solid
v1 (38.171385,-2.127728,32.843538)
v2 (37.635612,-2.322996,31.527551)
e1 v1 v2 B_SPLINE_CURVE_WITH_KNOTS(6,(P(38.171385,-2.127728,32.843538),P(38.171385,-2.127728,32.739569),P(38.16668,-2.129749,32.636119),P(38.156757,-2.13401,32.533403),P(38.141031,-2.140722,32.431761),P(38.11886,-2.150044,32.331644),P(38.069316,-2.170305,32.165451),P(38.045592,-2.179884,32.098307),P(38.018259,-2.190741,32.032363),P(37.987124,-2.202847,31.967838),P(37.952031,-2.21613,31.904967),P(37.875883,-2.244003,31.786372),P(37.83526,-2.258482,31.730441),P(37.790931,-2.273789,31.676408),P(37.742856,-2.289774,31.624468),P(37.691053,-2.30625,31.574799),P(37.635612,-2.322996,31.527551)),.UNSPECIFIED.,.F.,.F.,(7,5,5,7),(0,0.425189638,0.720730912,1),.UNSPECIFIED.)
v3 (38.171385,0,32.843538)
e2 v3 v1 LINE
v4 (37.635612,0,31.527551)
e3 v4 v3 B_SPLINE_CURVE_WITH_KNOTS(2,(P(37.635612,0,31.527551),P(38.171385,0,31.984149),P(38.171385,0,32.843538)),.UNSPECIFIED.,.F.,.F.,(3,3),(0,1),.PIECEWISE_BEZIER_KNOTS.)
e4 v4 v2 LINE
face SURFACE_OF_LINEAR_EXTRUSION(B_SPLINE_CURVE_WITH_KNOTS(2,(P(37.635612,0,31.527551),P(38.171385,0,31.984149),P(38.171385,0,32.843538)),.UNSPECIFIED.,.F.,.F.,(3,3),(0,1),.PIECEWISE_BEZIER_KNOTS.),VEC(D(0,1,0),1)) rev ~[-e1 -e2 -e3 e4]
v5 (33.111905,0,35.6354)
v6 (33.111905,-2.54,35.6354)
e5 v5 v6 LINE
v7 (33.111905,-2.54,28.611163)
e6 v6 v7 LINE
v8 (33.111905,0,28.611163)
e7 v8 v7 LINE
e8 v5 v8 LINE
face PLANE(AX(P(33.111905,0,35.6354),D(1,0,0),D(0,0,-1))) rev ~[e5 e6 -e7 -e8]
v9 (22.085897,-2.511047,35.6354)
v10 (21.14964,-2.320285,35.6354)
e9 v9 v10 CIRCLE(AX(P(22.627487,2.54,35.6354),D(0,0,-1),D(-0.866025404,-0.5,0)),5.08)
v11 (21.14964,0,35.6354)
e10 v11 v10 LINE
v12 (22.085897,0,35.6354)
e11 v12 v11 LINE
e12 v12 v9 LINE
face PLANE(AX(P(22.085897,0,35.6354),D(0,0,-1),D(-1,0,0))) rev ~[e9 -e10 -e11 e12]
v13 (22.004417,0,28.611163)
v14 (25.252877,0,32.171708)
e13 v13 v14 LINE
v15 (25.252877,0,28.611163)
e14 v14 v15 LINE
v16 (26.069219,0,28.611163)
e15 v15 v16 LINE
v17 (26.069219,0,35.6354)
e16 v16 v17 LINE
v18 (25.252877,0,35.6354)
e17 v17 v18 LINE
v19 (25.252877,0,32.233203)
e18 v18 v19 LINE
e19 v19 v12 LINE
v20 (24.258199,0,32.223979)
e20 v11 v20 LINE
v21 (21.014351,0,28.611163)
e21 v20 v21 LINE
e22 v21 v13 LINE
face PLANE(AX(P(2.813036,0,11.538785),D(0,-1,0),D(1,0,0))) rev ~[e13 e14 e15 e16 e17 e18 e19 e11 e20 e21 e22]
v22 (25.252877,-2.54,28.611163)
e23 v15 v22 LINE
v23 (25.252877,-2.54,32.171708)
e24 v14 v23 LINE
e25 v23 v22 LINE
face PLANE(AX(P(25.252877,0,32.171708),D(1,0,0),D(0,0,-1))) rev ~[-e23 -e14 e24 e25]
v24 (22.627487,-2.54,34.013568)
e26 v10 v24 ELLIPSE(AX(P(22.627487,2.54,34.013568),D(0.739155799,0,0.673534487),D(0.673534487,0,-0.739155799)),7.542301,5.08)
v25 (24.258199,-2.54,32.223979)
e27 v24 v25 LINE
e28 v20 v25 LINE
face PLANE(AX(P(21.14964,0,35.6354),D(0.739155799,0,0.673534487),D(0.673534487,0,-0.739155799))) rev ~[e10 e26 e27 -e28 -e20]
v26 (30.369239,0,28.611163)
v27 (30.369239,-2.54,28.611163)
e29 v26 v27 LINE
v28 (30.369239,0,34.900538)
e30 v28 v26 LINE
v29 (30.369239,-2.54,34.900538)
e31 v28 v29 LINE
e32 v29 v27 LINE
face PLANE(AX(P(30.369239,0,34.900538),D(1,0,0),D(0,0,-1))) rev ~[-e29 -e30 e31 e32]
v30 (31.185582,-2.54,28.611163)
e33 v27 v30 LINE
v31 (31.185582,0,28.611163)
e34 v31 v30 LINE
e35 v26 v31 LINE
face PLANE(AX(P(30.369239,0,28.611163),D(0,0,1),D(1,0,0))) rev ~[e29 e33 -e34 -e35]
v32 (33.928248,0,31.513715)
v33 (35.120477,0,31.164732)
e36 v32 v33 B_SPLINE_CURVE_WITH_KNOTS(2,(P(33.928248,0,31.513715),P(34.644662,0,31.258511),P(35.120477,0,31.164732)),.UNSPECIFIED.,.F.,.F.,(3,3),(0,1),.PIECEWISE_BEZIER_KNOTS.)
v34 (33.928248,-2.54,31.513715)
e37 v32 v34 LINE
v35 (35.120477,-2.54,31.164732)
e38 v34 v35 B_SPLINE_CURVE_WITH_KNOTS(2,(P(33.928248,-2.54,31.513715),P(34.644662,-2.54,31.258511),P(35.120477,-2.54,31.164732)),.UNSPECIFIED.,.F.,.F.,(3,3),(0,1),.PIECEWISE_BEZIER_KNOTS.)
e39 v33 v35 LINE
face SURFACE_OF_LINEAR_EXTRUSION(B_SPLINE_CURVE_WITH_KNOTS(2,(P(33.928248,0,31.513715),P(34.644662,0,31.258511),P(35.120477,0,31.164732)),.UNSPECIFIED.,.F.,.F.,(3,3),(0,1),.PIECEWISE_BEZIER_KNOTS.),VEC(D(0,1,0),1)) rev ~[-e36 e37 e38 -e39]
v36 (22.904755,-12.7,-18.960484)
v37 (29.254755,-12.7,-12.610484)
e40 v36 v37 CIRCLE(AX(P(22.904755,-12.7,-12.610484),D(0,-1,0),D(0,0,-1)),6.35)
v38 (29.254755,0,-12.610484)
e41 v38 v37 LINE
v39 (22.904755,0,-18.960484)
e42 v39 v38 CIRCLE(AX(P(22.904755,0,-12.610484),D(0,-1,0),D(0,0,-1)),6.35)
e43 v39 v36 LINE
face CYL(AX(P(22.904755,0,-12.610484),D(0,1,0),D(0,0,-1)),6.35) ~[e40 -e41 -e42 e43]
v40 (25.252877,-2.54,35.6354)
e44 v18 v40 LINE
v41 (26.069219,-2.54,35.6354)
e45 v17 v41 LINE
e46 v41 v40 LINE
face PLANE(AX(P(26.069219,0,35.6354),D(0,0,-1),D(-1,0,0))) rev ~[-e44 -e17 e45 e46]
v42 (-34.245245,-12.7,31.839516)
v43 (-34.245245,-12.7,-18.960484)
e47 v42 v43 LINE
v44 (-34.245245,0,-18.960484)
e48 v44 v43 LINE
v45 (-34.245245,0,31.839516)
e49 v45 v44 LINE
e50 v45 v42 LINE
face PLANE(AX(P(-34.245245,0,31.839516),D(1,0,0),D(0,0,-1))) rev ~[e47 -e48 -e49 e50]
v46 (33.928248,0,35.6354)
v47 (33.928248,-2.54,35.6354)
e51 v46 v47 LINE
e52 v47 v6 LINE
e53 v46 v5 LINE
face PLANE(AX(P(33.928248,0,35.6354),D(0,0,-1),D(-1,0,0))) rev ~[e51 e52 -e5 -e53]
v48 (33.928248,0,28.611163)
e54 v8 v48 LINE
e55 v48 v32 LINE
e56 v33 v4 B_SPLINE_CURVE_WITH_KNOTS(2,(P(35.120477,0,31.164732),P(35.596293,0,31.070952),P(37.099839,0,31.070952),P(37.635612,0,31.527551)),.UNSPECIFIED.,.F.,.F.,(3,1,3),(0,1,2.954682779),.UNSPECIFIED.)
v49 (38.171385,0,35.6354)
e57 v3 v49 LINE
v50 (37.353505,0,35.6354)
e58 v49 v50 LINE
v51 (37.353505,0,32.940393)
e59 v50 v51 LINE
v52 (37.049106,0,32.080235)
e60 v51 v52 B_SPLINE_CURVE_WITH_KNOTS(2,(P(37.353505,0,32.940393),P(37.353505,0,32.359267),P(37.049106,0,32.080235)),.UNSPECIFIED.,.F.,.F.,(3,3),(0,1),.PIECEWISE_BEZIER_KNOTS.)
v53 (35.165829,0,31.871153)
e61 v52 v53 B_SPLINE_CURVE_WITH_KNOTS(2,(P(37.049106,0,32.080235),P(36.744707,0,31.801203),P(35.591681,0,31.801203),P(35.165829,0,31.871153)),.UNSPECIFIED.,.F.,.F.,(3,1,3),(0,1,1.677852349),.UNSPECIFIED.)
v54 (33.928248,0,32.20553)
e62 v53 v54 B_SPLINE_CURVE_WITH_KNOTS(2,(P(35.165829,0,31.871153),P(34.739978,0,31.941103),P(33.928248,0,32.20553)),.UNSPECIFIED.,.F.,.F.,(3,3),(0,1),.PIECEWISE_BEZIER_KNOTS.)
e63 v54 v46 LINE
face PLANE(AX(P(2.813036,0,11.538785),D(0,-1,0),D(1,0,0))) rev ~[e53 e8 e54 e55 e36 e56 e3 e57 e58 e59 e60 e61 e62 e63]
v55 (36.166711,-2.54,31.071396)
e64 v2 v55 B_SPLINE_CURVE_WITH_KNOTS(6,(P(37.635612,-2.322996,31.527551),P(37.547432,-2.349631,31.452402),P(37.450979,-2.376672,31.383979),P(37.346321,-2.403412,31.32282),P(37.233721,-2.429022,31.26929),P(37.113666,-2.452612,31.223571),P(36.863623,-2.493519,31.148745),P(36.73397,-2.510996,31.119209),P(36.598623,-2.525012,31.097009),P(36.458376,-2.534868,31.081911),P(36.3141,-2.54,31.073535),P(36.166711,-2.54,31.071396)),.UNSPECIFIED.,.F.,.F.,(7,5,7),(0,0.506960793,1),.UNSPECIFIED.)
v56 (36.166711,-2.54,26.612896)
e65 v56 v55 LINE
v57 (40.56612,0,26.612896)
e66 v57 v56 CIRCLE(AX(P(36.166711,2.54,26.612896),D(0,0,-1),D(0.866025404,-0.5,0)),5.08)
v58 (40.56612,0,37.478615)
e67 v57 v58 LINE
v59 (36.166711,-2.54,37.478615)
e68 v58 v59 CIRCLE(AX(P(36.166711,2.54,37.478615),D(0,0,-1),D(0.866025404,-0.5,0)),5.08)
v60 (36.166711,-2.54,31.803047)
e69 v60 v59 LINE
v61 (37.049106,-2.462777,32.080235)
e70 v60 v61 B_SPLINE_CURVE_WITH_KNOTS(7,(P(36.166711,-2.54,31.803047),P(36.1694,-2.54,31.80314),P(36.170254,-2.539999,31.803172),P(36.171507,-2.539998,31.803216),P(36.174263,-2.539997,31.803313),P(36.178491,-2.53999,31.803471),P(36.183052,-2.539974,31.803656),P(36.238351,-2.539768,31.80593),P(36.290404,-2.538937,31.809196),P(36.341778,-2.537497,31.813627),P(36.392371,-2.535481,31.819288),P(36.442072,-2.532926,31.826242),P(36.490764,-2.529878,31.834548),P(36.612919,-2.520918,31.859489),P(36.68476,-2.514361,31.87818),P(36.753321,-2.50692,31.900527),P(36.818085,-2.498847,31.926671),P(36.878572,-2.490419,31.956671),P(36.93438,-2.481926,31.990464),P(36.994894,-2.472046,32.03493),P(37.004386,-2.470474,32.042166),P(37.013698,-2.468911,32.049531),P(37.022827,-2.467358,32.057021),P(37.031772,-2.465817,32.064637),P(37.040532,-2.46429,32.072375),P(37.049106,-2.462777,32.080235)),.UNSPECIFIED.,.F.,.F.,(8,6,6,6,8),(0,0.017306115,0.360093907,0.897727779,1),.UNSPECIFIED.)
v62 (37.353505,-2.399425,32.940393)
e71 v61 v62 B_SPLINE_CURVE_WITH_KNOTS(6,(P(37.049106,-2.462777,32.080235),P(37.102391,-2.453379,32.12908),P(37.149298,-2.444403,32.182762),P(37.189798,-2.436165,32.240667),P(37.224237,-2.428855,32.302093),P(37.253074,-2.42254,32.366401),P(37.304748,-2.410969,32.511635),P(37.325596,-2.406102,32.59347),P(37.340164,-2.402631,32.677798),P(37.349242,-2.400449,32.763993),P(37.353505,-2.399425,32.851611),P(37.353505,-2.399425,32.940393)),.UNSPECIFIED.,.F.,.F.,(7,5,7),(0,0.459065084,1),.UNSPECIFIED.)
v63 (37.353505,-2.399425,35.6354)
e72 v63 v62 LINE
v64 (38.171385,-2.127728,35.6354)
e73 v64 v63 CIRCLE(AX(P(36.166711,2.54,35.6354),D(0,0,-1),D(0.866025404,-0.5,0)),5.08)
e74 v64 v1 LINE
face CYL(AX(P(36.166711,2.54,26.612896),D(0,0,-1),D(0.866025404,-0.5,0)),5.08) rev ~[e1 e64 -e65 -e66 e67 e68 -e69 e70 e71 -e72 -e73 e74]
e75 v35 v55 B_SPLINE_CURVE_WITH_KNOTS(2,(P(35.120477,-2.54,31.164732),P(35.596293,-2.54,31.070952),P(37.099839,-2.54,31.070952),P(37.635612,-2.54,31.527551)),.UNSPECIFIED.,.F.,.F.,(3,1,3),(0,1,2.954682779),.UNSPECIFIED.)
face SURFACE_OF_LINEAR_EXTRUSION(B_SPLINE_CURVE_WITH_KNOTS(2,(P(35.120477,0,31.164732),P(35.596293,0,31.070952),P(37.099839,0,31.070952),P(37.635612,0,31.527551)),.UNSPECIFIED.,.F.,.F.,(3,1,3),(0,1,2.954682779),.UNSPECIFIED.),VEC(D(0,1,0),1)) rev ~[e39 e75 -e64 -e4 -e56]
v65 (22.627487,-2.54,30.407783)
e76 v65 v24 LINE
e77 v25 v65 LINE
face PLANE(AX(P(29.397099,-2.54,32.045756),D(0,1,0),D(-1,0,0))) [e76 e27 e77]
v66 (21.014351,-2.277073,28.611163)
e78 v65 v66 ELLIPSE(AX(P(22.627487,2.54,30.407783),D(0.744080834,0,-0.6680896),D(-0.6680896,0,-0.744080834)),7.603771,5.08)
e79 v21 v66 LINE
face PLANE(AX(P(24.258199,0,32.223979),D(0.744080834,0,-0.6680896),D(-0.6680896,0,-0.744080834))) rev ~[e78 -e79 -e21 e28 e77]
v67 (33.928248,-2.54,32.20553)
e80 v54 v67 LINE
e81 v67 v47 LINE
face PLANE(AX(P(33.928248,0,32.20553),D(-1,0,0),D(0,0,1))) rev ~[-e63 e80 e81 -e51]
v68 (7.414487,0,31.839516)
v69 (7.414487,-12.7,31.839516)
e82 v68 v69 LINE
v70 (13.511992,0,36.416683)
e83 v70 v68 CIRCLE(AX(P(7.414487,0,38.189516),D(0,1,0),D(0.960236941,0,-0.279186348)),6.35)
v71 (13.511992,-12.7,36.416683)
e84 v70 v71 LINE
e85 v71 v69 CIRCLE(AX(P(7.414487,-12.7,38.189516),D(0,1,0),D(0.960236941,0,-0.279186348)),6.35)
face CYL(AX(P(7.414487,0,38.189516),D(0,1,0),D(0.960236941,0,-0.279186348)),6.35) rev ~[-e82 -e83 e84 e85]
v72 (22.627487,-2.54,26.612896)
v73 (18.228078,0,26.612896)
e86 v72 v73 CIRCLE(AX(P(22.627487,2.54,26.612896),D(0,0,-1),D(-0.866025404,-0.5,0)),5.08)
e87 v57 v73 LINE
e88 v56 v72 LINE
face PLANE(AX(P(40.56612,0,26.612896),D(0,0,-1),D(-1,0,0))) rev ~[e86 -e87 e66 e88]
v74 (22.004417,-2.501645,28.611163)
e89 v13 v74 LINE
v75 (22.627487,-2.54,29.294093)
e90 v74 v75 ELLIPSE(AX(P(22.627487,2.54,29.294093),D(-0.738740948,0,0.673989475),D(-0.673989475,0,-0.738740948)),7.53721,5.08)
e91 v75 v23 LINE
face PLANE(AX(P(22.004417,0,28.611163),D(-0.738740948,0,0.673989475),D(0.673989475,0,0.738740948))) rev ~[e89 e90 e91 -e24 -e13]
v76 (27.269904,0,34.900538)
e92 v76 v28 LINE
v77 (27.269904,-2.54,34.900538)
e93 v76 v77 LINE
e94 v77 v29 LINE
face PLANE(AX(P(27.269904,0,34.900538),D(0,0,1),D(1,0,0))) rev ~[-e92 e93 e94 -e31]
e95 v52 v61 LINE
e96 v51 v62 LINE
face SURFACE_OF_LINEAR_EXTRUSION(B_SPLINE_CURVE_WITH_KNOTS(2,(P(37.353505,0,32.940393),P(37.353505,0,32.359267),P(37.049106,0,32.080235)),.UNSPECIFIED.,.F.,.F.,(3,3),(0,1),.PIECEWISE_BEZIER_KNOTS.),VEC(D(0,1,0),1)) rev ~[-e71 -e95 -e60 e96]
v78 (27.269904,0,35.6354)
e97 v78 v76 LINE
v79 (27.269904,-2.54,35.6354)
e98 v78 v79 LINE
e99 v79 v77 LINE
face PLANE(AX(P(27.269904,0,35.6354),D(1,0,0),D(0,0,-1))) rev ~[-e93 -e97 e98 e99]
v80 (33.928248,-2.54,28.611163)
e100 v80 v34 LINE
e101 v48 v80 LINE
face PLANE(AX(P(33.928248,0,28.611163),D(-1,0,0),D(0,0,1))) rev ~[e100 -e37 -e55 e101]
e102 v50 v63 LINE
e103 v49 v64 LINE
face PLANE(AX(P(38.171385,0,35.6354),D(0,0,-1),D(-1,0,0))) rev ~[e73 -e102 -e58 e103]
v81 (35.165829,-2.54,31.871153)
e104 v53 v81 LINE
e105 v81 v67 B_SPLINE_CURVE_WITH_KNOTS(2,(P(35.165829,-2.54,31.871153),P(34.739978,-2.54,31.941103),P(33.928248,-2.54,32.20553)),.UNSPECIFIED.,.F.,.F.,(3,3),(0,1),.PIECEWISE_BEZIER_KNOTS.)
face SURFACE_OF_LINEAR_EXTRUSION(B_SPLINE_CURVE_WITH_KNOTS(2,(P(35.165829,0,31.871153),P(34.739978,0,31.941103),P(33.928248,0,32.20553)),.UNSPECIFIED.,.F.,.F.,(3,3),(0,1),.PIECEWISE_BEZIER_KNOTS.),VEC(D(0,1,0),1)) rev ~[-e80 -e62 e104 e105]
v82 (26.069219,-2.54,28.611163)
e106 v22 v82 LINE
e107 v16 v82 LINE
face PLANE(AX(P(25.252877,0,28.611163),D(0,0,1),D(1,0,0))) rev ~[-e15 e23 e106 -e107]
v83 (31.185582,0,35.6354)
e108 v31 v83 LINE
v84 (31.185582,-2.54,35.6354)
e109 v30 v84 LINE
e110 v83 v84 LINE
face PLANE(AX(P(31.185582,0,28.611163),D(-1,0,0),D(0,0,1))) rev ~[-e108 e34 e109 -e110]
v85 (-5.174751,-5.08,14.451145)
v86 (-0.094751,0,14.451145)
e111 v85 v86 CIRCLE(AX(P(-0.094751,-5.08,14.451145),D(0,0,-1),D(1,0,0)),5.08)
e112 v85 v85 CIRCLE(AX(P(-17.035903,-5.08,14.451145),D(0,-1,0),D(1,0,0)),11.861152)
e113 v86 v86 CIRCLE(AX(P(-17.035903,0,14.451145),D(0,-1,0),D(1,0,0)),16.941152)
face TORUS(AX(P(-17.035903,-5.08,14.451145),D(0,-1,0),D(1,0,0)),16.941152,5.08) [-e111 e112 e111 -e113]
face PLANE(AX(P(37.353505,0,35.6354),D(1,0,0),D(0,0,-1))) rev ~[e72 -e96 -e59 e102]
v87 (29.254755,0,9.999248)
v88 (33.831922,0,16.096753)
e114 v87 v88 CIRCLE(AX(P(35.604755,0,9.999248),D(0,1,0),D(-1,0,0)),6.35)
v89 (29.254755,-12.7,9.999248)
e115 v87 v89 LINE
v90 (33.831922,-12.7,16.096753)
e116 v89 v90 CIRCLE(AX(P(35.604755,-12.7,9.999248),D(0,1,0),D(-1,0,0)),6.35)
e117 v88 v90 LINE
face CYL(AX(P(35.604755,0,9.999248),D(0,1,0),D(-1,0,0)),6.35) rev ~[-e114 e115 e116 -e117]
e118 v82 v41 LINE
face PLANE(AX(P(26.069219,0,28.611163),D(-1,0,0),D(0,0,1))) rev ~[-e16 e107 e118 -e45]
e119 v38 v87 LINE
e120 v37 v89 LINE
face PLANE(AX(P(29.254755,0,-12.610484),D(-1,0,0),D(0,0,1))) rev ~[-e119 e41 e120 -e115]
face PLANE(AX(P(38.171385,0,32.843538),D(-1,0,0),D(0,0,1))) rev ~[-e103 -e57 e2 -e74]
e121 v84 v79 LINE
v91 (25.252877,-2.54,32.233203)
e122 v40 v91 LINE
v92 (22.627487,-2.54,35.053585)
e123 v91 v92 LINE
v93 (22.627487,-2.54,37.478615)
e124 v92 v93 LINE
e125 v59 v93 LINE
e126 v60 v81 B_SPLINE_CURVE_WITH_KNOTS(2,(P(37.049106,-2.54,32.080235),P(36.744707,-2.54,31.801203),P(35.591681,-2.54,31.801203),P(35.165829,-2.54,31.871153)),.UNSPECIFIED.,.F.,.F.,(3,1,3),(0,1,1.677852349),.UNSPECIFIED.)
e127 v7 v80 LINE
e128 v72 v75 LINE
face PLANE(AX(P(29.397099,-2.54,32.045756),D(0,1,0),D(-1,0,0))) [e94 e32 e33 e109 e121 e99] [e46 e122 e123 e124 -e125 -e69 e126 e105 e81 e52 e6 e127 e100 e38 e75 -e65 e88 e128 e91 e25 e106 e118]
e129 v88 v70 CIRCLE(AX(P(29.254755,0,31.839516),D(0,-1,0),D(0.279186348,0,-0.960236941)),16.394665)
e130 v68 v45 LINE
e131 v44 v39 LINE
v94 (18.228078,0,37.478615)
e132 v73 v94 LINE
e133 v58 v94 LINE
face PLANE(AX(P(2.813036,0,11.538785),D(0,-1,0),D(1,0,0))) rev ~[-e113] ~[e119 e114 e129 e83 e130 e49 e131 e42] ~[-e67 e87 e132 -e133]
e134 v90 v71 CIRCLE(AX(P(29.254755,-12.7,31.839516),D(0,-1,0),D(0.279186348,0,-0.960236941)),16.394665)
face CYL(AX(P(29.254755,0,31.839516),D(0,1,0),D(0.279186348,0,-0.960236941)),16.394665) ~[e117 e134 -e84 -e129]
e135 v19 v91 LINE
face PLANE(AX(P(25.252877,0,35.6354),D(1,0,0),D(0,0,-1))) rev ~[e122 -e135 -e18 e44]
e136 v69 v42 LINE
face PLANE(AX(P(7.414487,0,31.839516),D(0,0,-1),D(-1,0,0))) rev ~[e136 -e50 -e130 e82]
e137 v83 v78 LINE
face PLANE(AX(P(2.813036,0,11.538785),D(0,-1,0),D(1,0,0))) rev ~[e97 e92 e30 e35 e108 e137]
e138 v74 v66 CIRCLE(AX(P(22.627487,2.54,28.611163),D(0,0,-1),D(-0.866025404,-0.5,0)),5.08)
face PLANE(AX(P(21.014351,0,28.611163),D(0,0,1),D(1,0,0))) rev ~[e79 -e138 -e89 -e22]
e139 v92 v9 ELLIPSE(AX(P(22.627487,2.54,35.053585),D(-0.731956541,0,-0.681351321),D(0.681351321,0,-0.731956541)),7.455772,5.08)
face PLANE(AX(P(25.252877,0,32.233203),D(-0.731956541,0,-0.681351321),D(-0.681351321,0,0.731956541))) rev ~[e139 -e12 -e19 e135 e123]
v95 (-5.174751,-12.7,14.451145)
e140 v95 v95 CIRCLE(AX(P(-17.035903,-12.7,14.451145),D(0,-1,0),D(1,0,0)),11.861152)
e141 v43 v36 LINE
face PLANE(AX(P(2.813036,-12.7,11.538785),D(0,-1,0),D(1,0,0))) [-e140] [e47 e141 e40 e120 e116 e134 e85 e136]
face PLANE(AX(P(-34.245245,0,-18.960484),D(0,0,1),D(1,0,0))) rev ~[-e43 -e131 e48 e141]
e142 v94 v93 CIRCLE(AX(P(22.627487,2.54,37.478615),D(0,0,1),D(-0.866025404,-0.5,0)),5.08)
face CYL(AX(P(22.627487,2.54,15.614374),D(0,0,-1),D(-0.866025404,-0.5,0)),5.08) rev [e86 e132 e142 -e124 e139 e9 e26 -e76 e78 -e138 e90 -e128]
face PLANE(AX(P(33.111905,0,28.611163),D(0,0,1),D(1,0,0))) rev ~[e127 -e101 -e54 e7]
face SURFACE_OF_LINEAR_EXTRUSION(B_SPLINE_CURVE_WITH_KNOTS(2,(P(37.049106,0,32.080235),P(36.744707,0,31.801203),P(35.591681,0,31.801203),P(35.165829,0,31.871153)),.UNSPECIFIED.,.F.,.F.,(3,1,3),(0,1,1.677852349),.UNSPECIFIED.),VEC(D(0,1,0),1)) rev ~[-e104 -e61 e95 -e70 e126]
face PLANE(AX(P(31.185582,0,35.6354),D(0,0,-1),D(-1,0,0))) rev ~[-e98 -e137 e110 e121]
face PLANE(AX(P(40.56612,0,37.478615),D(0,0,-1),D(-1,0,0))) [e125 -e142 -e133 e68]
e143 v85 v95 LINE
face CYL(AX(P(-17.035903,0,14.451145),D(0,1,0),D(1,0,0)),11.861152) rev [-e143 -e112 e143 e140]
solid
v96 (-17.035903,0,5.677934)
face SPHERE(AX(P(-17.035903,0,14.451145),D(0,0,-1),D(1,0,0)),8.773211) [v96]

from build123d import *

# Parameters (mm, degrees)
F0_R        = 11.8611520112
F1_DEPTH    = 12.7
F4_R        = 5.08
F5_W        = 22.3380420357
F5_H        = 10.8657181263
F6_DEPTH    = 2.54
F7_T1_DEPTH = 21.8642407544
F8_T1_DEPTH = 10.8657181263


# Not quite as in the source:
# - a fillet or chamfer that OpenCascade refuses, or shapes differently, is made with other operations: its cross-section is extruded or revolved along the edge and cut away or added


with BuildPart() as f1:
    # F0 (on Front) → F1 (new body)
    with BuildSketch(Plane.XZ):
        with BuildLine():
            Line((7.4144873275, 31.8395160139), (-34.2452449948, 31.8395160139))
            Line((-34.2452449948, 31.8395160139), (-34.2452449948, -18.9604839861))
            Line((-34.2452449948, -18.9604839861), (22.9047550052, -18.9604839861))
            ThreePointArc((22.9047550052, -18.9604839861), (27.3948830658, -17.1006120467), (29.2547550052, -12.6104839861))
            Line((29.2547550052, -12.6104839861), (29.2547550052, 9.9992483361))
            ThreePointArc((29.2547550052, 9.9992483361), (30.5263698523, 13.8114005154), (33.8319216944, 16.0967529119))
            ThreePointArc((33.8319216944, 16.0967529119), (40.8475338995, 43.4322949081), (13.5119919033, 36.416682703))
            ThreePointArc((13.5119919033, 36.416682703), (11.2266395068, 33.1111308609), (7.4144873275, 31.8395160139))
        make_face()
        with Locations((-17.0359034091, 14.4511451945)):
            Circle(F0_R, mode=Mode.SUBTRACT)
    extrude(amount=F1_DEPTH)

    # F4
    f4_edges = [f1.edges().sort_by_distance(p)[0] for p in [
        (-28.897055, 0, 14.451145),
    ]]
    fillet(f4_edges, radius=F4_R)

    # F5 (on face) → F6 (cut)
    with BuildSketch(Plane(origin=(0, 0, 0), x_dir=(-1, 0, 0), z_dir=(0, 1, 0))):
        with Locations((-29.3970992789, 32.0457555354)):
            Rectangle(F5_W, F5_H)
        with BuildLine():
            Line((-33.1119049952, 35.6353998723), (-33.1119049952, 28.6111626774))
            Line((-33.1119049952, 28.6111626774), (-33.9282477289, 28.6111626774))
            Line((-33.9282477289, 28.6111626774), (-33.9282477289, 31.5137146196))
            add(Edge.make_bspline(
                [(-33.9282477289, 31.5137146196), (-34.6446615028, 31.2585114298), (-35.1204770886, 31.1647319443)],
                knots=[0, 0, 0, 1, 1, 1], degree=2))
            add(Edge.make_bspline(
                [(-35.1204770886, 31.1647319443), (-35.5962926745, 31.0709524589), (-36.1051616856, 31.0709524589)],
                knots=[0, 0, 0, 1, 1, 1], degree=2))
            add(Edge.make_bspline(
                [(-36.1051616856, 31.0709524589), (-37.0998391785, 31.0709524589), (-37.6356121402, 31.5275509371)],
                knots=[0, 0, 0, 1, 1, 1], degree=2))
            add(Edge.make_bspline(
                [(-37.6356121402, 31.5275509371), (-38.171385102, 31.9841494153), (-38.171385102, 32.8435384702)],
                knots=[0, 0, 0, 1, 1, 1], degree=2))
            Line((-38.171385102, 32.8435384702), (-38.171385102, 35.6353998723))
            Line((-38.171385102, 35.6353998723), (-37.3535049997, 35.6353998723))
            Line((-37.3535049997, 35.6353998723), (-37.3535049997, 32.9403926929))
            add(Edge.make_bspline(
                [(-37.3535049997, 32.9403926929), (-37.3535049997, 32.359267357), (-37.0491060142, 32.0802349537)],
                knots=[0, 0, 0, 1, 1, 1], degree=2))
            add(Edge.make_bspline(
                [(-37.0491060142, 32.0802349537), (-36.7447070287, 31.8012025503), (-36.0575032585, 31.8012025503)],
                knots=[0, 0, 0, 1, 1, 1], degree=2))
            add(Edge.make_bspline(
                [(-36.0575032585, 31.8012025503), (-35.5916805687, 31.8012025503), (-35.1658294627, 31.8711528222)],
                knots=[0, 0, 0, 1, 1, 1], degree=2))
            add(Edge.make_bspline(
                [(-35.1658294627, 31.8711528222), (-34.7399783568, 31.9411030941), (-33.9282477289, 32.2055304957)],
                knots=[0, 0, 0, 1, 1, 1], degree=2))
            Line((-33.9282477289, 32.2055304957), (-33.9282477289, 35.6353998723))
            Line((-33.9282477289, 35.6353998723), (-33.1119049952, 35.6353998723))
        make_face(mode=Mode.SUBTRACT)
        Polygon((-31.1855821225, 35.6353998723), (-27.2699042641, 35.6353998723), (-27.2699042641, 34.900537675), (-30.3692393888, 34.900537675), (-30.3692393888, 28.6111626774), (-31.1855821225, 28.6111626774), align=None, mode=Mode.SUBTRACT)
        Polygon((-24.2581991503, 32.223978919), (-21.0143513759, 28.6111626774), (-22.004416763, 28.6111626774), (-25.2528766432, 32.1717083862), (-25.2528766432, 28.6111626774), (-26.0692193769, 28.6111626774), (-26.0692193769, 35.6353998723), (-25.2528766432, 35.6353998723), (-25.2528766432, 32.2332031307), (-22.0858972995, 35.6353998723), (-21.1496398139, 35.6353998723), align=None, mode=Mode.SUBTRACT)
    extrude(amount=-F6_DEPTH, mode=Mode.SUBTRACT)

    # F7: fillet of radius 5.08 on 1 edges, made by hand

    # F7_s2 → F7_t1 (join)
    with BuildSketch(Plane.XY.offset(15.6143738442)):
        with BuildLine():
            ThreePointArc((18.228078261, 0), (20.0874873122, -1.8594090512), (22.6274873122, -2.54))
            Line((22.6274873122, -2.54), (18.228078261, -2.54))
            Line((18.228078261, -2.54), (18.228078261, 0))
        make_face()
    extrude(amount=F7_T1_DEPTH)

    # F8: fillet of radius 5.08 on 1 edges, made by hand

    # F8_s2 → F8_t1 (join)
    with BuildSketch(Plane.XY.offset(26.6128964722)):
        with BuildLine():
            ThreePointArc((40.5661202967, 0), (38.7067112455, -1.8594090512), (36.1667112455, -2.54))
            Line((36.1667112455, -2.54), (40.5661202967, -2.54))
            Line((40.5661202967, -2.54), (40.5661202967, 0))
        make_face()
    extrude(amount=F8_T1_DEPTH)


with BuildPart() as f3:
    # F2 (on face) → F3 (revolve)
    with BuildSketch(Plane(origin=(0, 0, 0), x_dir=(-1, 0, 0), z_dir=(0, 1, 0))):
        with BuildLine():
            Line((17.0359034091, 14.4511451945), (17.0359034091, 23.2243563161))
            ThreePointArc((17.0359034091, 23.2243563161), (8.2626922875, 14.4511451945), (17.0359034091, 5.6779340729))
            Line((17.0359034091, 5.6779340729), (17.0359034091, 14.4511451945))
        make_face()
    revolve(axis=Axis((-17.0359034091, 0, 14.4511451945), (0, 0, -1)))


solid = Compound([f1.part, f3.part])
